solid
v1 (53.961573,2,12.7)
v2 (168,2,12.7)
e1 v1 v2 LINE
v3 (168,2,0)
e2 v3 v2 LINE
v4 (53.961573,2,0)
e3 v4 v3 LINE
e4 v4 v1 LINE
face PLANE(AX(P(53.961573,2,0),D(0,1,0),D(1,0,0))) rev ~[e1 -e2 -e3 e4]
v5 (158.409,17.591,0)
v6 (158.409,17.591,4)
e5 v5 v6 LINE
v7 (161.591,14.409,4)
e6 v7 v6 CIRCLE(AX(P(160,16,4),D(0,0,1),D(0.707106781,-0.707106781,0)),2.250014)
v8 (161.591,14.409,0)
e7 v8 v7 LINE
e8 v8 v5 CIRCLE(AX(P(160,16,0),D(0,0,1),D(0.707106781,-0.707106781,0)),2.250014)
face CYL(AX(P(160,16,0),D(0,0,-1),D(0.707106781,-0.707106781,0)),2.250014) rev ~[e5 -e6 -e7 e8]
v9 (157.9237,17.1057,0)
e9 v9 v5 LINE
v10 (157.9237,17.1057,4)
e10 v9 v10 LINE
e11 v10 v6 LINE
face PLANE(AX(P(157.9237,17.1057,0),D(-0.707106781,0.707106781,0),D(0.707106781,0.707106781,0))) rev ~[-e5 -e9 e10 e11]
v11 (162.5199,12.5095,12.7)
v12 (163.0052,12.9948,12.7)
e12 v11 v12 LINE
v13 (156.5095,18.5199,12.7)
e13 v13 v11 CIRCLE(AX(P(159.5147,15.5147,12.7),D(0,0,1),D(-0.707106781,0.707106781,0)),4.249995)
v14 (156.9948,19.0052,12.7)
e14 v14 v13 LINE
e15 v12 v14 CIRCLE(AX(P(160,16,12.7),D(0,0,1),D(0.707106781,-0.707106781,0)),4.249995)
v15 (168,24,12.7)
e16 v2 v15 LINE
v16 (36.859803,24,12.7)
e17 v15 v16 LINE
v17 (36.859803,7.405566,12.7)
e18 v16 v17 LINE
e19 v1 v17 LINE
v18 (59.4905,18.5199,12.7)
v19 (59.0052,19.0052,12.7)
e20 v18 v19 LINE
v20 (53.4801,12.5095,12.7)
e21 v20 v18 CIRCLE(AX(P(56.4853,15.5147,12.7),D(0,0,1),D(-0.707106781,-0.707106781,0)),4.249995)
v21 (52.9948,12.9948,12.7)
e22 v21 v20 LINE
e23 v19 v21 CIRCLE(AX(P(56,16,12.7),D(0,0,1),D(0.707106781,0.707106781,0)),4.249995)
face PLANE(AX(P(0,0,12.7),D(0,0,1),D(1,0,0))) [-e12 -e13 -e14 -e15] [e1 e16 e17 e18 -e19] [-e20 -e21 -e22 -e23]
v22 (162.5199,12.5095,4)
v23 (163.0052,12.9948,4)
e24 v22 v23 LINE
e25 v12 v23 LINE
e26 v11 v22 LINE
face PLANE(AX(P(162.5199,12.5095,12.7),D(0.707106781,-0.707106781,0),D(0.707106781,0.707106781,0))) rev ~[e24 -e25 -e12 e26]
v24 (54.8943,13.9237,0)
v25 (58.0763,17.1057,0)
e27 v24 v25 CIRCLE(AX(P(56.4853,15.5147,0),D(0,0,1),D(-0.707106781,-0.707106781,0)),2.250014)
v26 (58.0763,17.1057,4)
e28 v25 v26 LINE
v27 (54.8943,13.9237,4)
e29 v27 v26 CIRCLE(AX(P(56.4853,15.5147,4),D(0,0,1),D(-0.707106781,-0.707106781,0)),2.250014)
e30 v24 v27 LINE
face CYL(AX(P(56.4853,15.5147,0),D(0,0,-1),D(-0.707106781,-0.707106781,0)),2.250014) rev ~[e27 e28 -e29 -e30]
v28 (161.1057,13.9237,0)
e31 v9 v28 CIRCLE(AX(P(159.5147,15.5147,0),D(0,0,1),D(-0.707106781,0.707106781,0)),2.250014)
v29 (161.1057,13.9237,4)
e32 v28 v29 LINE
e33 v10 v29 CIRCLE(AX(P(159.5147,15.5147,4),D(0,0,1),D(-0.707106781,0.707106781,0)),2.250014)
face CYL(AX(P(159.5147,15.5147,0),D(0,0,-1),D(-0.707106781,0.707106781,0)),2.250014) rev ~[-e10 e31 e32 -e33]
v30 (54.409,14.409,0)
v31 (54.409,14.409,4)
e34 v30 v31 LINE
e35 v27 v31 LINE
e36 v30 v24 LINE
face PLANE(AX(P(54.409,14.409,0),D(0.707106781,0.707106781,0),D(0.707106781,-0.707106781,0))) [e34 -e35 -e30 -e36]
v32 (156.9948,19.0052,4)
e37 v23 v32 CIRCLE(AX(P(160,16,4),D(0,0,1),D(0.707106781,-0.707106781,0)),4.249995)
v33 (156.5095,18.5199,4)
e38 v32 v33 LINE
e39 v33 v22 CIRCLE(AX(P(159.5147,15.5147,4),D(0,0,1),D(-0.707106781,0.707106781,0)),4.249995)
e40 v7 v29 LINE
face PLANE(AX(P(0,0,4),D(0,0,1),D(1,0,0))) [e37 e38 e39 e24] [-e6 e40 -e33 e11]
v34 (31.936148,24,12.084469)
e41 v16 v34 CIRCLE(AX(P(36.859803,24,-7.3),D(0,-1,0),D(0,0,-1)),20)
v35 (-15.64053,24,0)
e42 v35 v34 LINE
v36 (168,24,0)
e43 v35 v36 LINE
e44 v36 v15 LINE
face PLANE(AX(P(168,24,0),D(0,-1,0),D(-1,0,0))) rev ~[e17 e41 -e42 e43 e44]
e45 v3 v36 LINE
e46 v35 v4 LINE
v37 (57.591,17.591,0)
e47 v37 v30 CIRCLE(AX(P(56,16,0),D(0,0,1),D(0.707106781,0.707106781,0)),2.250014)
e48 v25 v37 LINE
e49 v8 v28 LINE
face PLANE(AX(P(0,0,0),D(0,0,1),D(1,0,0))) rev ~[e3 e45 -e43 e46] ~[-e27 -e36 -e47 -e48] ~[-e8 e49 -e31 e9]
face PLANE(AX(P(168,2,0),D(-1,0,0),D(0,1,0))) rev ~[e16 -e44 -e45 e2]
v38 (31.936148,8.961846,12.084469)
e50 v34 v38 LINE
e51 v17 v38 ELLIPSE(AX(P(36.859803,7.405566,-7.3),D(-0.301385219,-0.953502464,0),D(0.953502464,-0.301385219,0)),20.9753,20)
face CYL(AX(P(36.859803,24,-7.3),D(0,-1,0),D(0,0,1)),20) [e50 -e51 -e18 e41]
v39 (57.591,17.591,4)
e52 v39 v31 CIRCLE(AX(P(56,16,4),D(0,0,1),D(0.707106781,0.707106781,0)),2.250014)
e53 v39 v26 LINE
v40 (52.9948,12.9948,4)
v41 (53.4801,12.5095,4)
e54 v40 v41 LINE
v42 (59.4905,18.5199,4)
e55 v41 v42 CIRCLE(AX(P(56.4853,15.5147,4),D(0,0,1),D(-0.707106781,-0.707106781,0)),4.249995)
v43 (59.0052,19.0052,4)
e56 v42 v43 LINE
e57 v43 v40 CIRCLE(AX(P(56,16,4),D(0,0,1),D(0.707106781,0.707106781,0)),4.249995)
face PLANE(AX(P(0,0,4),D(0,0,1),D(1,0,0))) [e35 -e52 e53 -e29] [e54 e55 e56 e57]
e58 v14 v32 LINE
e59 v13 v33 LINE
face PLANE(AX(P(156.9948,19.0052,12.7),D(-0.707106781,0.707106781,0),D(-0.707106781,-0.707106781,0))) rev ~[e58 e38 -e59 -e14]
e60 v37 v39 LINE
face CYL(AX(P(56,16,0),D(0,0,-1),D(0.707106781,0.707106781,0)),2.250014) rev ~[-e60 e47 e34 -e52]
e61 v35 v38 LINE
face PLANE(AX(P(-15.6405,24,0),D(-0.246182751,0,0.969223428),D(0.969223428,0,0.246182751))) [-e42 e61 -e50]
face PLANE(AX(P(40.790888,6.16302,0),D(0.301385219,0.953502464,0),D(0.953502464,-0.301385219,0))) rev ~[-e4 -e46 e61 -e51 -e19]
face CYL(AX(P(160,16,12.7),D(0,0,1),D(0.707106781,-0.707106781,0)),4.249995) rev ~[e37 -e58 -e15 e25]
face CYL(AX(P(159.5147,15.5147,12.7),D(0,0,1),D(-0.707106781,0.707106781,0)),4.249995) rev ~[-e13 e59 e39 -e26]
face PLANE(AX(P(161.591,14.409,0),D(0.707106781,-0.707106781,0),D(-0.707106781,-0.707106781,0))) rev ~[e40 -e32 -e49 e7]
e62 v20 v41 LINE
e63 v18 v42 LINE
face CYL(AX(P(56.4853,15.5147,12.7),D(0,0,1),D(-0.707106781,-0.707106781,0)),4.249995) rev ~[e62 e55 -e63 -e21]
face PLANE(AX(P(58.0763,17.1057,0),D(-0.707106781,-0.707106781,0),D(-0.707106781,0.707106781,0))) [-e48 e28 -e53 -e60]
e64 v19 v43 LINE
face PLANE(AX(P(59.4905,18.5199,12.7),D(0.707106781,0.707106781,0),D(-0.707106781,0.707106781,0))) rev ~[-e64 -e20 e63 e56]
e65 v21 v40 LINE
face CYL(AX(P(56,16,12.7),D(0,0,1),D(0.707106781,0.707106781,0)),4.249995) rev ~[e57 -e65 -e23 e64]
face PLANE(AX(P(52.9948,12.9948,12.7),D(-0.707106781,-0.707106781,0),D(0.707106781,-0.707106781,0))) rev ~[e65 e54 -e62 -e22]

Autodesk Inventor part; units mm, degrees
ref_plane "YZ Plane" through (0, 0, 0) normal (1, 0, 0) x (0, 1, 0)
ref_plane "XZ Plane" through (0, 0, 0) normal (0, 1, 0) x (-1, 0, 0)
ref_plane "XY Plane" through (0, 0, 0) normal (0, 0, 1) x (1, 0, 0)
ref_plane "Work Plane1" through (0, 0, 0) normal (0, 0, 1) x (1, 0, 0)
sketch "Sketch1" plane through (0, 0, 0) normal (0, 0, 1) x (1, 0, 0)
  line L0 (168, 0) -> (168, 48) projected
  line L1 (0, 48) -> (168, 48) projected
  line L2 (0, 0) -> (0, 48) projected
  line L3 (0, 0) -> (168, 0) projected
  circle A0 centre (144, 24) radius 7 projected
  circle A1 centre (120, 24) radius 7 projected
  arc A2 (136.9289, 33.8995) -> (134.1005, 31.0711) centre (135.5147, 32.4853) ccw projected
  line L4 (137.4142, 33.4142) -> (136.9289, 33.8995) projected
  arc A3 (134.5858, 30.5858) -> (137.4142, 33.4142) centre (136, 32) ccw projected
  line L5 (134.1005, 31.0711) -> (134.5858, 30.5858) projected
  line L6 (132.6863, 26) -> (131.3137, 26) projected
  arc A4 (132.6863, 22) -> (132.6863, 26) centre (132.6863, 24) ccw projected
  line L7 (131.3137, 22) -> (132.6863, 22) projected
  arc A5 (131.3137, 26) -> (131.3137, 22) centre (131.3137, 24) ccw projected
  arc A6 (134.1005, 16.9289) -> (136.9289, 14.1005) centre (135.5147, 15.5147) ccw projected
  line L8 (134.5858, 17.4142) -> (134.1005, 16.9289) projected
  arc A7 (137.4142, 14.5858) -> (134.5858, 17.4142) centre (136, 16) ccw projected
  line L9 (136.9289, 14.1005) -> (137.4142, 14.5858) projected
  arc A8 (153.8995, 31.0711) -> (151.0711, 33.8995) centre (152.4853, 32.4853) ccw projected
  line L10 (153.4142, 30.5858) -> (153.8995, 31.0711) projected
  arc A9 (150.5858, 33.4142) -> (153.4142, 30.5858) centre (152, 32) ccw projected
  line L11 (151.0711, 33.8995) -> (150.5858, 33.4142) projected
  arc A10 (156.6863, 22) -> (156.6863, 26) centre (156.6863, 24) ccw projected
  line L12 (155.3137, 22) -> (156.6863, 22) projected
  arc A11 (155.3137, 26) -> (155.3137, 22) centre (155.3137, 24) ccw projected
  line L13 (156.6863, 26) -> (155.3137, 26) projected
  line L14 (146, 35.3137) -> (146, 40) projected
  arc A12 (142, 35.3137) -> (146, 35.3137) centre (144, 35.3137) ccw projected
  line L15 (142, 40) -> (142, 35.3137) projected
  arc A13 (146, 40) -> (142, 40) centre (144, 40) ccw projected
  circle A14 centre (136, 40) radius 2 projected
  circle A15 centre (128, 40) radius 2 projected
  line L16 (122, 35.3137) -> (122, 40) projected
  arc A16 (118, 35.3137) -> (122, 35.3137) centre (120, 35.3137) ccw projected
  line L17 (118, 40) -> (118, 35.3137) projected
  arc A17 (122, 40) -> (118, 40) centre (120, 40) ccw projected
  circle A18 centre (112, 40) radius 2 projected
  circle A19 centre (104, 40) radius 2 projected
  line L18 (98, 35.3137) -> (98, 40) projected
  arc A20 (94, 35.3137) -> (98, 35.3137) centre (96, 35.3137) ccw projected
  line L19 (94, 40) -> (94, 35.3137) projected
  arc A21 (98, 40) -> (94, 40) centre (96, 40) ccw projected
  circle A22 centre (88, 40) radius 2 projected
  circle A23 centre (80, 40) radius 2 projected
  line L20 (74, 35.3137) -> (74, 40) projected
  arc A24 (70, 35.3137) -> (74, 35.3137) centre (72, 35.3137) ccw projected
  line L21 (70, 40) -> (70, 35.3137) projected
  arc A25 (74, 40) -> (70, 40) centre (72, 40) ccw projected
  circle A26 centre (64, 40) radius 2 projected
  circle A27 centre (56, 40) radius 2 projected
  line L22 (50, 35.3137) -> (50, 40) projected
  arc A28 (46, 35.3137) -> (50, 35.3137) centre (48, 35.3137) ccw projected
  line L23 (46, 40) -> (46, 35.3137) projected
  arc A29 (50, 40) -> (46, 40) centre (48, 40) ccw projected
  circle A30 centre (40, 40) radius 2 projected
  circle A31 centre (32, 40) radius 2 projected
  line L24 (26, 35.3137) -> (26, 40) projected
  arc A32 (22, 35.3137) -> (26, 35.3137) centre (24, 35.3137) ccw projected
  line L25 (22, 40) -> (22, 35.3137) projected
  arc A33 (26, 40) -> (22, 40) centre (24, 40) ccw projected
  circle A34 centre (16, 40) radius 2 projected
  circle A35 centre (8, 40) radius 2 projected
  line L26 (142, 12.6863) -> (142, 8) projected
  arc A36 (146, 12.6863) -> (142, 12.6863) centre (144, 12.6863) ccw projected
  line L27 (146, 8) -> (146, 12.6863) projected
  arc A37 (142, 8) -> (146, 8) centre (144, 8) ccw projected
  circle A38 centre (136, 8) radius 2 projected
  circle A39 centre (128, 8) radius 2 projected
  line L28 (118, 12.6863) -> (118, 8) projected
  arc A40 (122, 12.6863) -> (118, 12.6863) centre (120, 12.6863) ccw projected
  line L29 (122, 8) -> (122, 12.6863) projected
  arc A41 (118, 8) -> (122, 8) centre (120, 8) ccw projected
  circle A42 centre (112, 8) radius 2 projected
  circle A43 centre (104, 8) radius 2 projected
  line L30 (94, 12.6863) -> (94, 8) projected
  arc A44 (98, 12.6863) -> (94, 12.6863) centre (96, 12.6863) ccw projected
  line L31 (98, 8) -> (98, 12.6863) projected
  arc A45 (94, 8) -> (98, 8) centre (96, 8) ccw projected
  circle A46 centre (88, 8) radius 2 projected
  circle A47 centre (80, 8) radius 2 projected
  line L32 (70, 12.6863) -> (70, 8) projected
  arc A48 (74, 12.6863) -> (70, 12.6863) centre (72, 12.6863) ccw projected
  line L33 (74, 8) -> (74, 12.6863) projected
  arc A49 (70, 8) -> (74, 8) centre (72, 8) ccw projected
  circle A50 centre (64, 8) radius 2 projected
  circle A51 centre (56, 8) radius 2 projected
  line L34 (46, 12.6863) -> (46, 8) projected
  arc A52 (50, 12.6863) -> (46, 12.6863) centre (48, 12.6863) ccw projected
  line L35 (50, 8) -> (50, 12.6863) projected
  arc A53 (46, 8) -> (50, 8) centre (48, 8) ccw projected
  circle A54 centre (40, 8) radius 2 projected
  circle A55 centre (32, 8) radius 2 projected
  line L36 (22, 12.6863) -> (22, 8) projected
  arc A56 (26, 12.6863) -> (22, 12.6863) centre (24, 12.6863) ccw projected
  line L37 (26, 8) -> (26, 12.6863) projected
  arc A57 (22, 8) -> (26, 8) centre (24, 8) ccw projected
  circle A58 centre (16, 8) radius 2 projected
  circle A59 centre (8, 8) radius 2 projected
  arc A60 (9.8995, 31.0711) -> (7.0711, 33.8995) centre (8.4853, 32.4853) ccw projected
  line L38 (9.4142, 30.5858) -> (9.8995, 31.0711) projected
  arc A61 (6.5858, 33.4142) -> (9.4142, 30.5858) centre (8, 32) ccw projected
  line L39 (7.0711, 33.8995) -> (6.5858, 33.4142) projected
  arc A62 (7.0711, 14.1005) -> (9.8995, 16.9289) centre (8.4853, 15.5147) ccw projected
  line L40 (6.5858, 14.5858) -> (7.0711, 14.1005) projected
  arc A63 (9.4142, 17.4142) -> (6.5858, 14.5858) centre (8, 16) ccw projected
  line L41 (9.8995, 16.9289) -> (9.4142, 17.4142) projected
  arc A64 (160.9289, 33.8995) -> (158.1005, 31.0711) centre (159.5147, 32.4853) ccw projected
  line L42 (161.4142, 33.4142) -> (160.9289, 33.8995) projected
  arc A65 (158.5858, 30.5858) -> (161.4142, 33.4142) centre (160, 32) ccw projected
  line L43 (158.1005, 31.0711) -> (158.5858, 30.5858) projected
  arc A66 (158.1005, 16.9289) -> (160.9289, 14.1005) centre (159.5147, 15.5147) ccw projected
  line L44 (158.5858, 17.4142) -> (158.1005, 16.9289) projected
  arc A67 (161.4142, 14.5858) -> (158.5858, 17.4142) centre (160, 16) ccw projected
  line L45 (160.9289, 14.1005) -> (161.4142, 14.5858) projected
  circle A68 centre (152, 8) radius 2 projected
  circle A69 centre (152, 40) radius 2 projected
  circle A70 centre (160, 40) radius 2 projected
  circle A71 centre (160, 8) radius 2 projected
  arc A72 (33.8995, 31.0711) -> (31.0711, 33.8995) centre (32.4853, 32.4853) ccw projected
  line L46 (33.4142, 30.5858) -> (33.8995, 31.0711) projected
  arc A73 (30.5858, 33.4142) -> (33.4142, 30.5858) centre (32, 32) ccw projected
  line L47 (31.0711, 33.8995) -> (30.5858, 33.4142) projected
  arc A74 (57.8995, 31.0711) -> (55.0711, 33.8995) centre (56.4853, 32.4853) ccw projected
  line L48 (57.4142, 30.5858) -> (57.8995, 31.0711) projected
  arc A75 (54.5858, 33.4142) -> (57.4142, 30.5858) centre (56, 32) ccw projected
  line L49 (55.0711, 33.8995) -> (54.5858, 33.4142) projected
  arc A76 (81.8995, 31.0711) -> (79.0711, 33.8995) centre (80.4853, 32.4853) ccw projected
  line L50 (81.4142, 30.5858) -> (81.8995, 31.0711) projected
  arc A77 (78.5858, 33.4142) -> (81.4142, 30.5858) centre (80, 32) ccw projected
  line L51 (79.0711, 33.8995) -> (78.5858, 33.4142) projected
  arc A78 (105.8995, 31.0711) -> (103.0711, 33.8995) centre (104.4853, 32.4853) ccw projected
  line L52 (105.4142, 30.5858) -> (105.8995, 31.0711) projected
  arc A79 (102.5858, 33.4142) -> (105.4142, 30.5858) centre (104, 32) ccw projected
  line L53 (103.0711, 33.8995) -> (102.5858, 33.4142) projected
  arc A80 (129.8995, 31.0711) -> (127.0711, 33.8995) centre (128.4853, 32.4853) ccw projected
  line L54 (129.4142, 30.5858) -> (129.8995, 31.0711) projected
  arc A81 (126.5858, 33.4142) -> (129.4142, 30.5858) centre (128, 32) ccw projected
  line L55 (127.0711, 33.8995) -> (126.5858, 33.4142) projected
  arc A82 (14.1005, 16.9289) -> (16.9289, 14.1005) centre (15.5147, 15.5147) ccw projected
  line L56 (14.5858, 17.4142) -> (14.1005, 16.9289) projected
  arc A83 (17.4142, 14.5858) -> (14.5858, 17.4142) centre (16, 16) ccw projected
  line L57 (16.9289, 14.1005) -> (17.4142, 14.5858) projected
  arc A84 (38.1005, 16.9289) -> (40.9289, 14.1005) centre (39.5147, 15.5147) ccw projected
  line L58 (38.5858, 17.4142) -> (38.1005, 16.9289) projected
  arc A85 (41.4142, 14.5858) -> (38.5858, 17.4142) centre (40, 16) ccw projected
  line L59 (40.9289, 14.1005) -> (41.4142, 14.5858) projected
  arc A86 (62.1005, 16.9289) -> (64.9289, 14.1005) centre (63.5147, 15.5147) ccw projected
  line L60 (62.5858, 17.4142) -> (62.1005, 16.9289) projected
  arc A87 (65.4142, 14.5858) -> (62.5858, 17.4142) centre (64, 16) ccw projected
  line L61 (64.9289, 14.1005) -> (65.4142, 14.5858) projected
  arc A88 (86.1005, 16.9289) -> (88.9289, 14.1005) centre (87.5147, 15.5147) ccw projected
  line L62 (86.5858, 17.4142) -> (86.1005, 16.9289) projected
  arc A89 (89.4142, 14.5858) -> (86.5858, 17.4142) centre (88, 16) ccw projected
  line L63 (88.9289, 14.1005) -> (89.4142, 14.5858) projected
  arc A90 (110.1005, 16.9289) -> (112.9289, 14.1005) centre (111.5147, 15.5147) ccw projected
  line L64 (110.5858, 17.4142) -> (110.1005, 16.9289) projected
  arc A91 (113.4142, 14.5858) -> (110.5858, 17.4142) centre (112, 16) ccw projected
  line L65 (112.9289, 14.1005) -> (113.4142, 14.5858) projected
  line L66 (11.3137, 22) -> (12.6863, 22) projected
  arc A92 (11.3137, 26) -> (11.3137, 22) centre (11.3137, 24) ccw projected
  line L67 (12.6863, 26) -> (11.3137, 26) projected
  arc A93 (12.6863, 22) -> (12.6863, 26) centre (12.6863, 24) ccw projected
  line L68 (36.6863, 26) -> (35.3137, 26) projected
  arc A94 (36.6863, 22) -> (36.6863, 26) centre (36.6863, 24) ccw projected
  line L69 (35.3137, 22) -> (36.6863, 22) projected
  arc A95 (35.3137, 26) -> (35.3137, 22) centre (35.3137, 24) ccw projected
  line L70 (60.6863, 26) -> (59.3137, 26) projected
  arc A96 (60.6863, 22) -> (60.6863, 26) centre (60.6863, 24) ccw projected
  line L71 (59.3137, 22) -> (60.6863, 22) projected
  arc A97 (59.3137, 26) -> (59.3137, 22) centre (59.3137, 24) ccw projected
  line L72 (84.6863, 26) -> (83.3137, 26) projected
  arc A98 (84.6863, 22) -> (84.6863, 26) centre (84.6863, 24) ccw projected
  line L73 (83.3137, 22) -> (84.6863, 22) projected
  arc A99 (83.3137, 26) -> (83.3137, 22) centre (83.3137, 24) ccw projected
  line L74 (108.6863, 26) -> (107.3137, 26) projected
  arc A100 (108.6863, 22) -> (108.6863, 26) centre (108.6863, 24) ccw projected
  line L75 (107.3137, 22) -> (108.6863, 22) projected
  arc A101 (107.3137, 26) -> (107.3137, 22) centre (107.3137, 24) ccw projected
  arc A102 (16.9289, 33.8995) -> (14.1005, 31.0711) centre (15.5147, 32.4853) ccw projected
  line L76 (17.4142, 33.4142) -> (16.9289, 33.8995) projected
  arc A103 (14.5858, 30.5858) -> (17.4142, 33.4142) centre (16, 32) ccw projected
  line L77 (14.1005, 31.0711) -> (14.5858, 30.5858) projected
  arc A104 (40.9289, 33.8995) -> (38.1005, 31.0711) centre (39.5147, 32.4853) ccw projected
  line L78 (41.4142, 33.4142) -> (40.9289, 33.8995) projected
  arc A105 (38.5858, 30.5858) -> (41.4142, 33.4142) centre (40, 32) ccw projected
  line L79 (38.1005, 31.0711) -> (38.5858, 30.5858) projected
  arc A106 (64.9289, 33.8995) -> (62.1005, 31.0711) centre (63.5147, 32.4853) ccw projected
  line L80 (65.4142, 33.4142) -> (64.9289, 33.8995) projected
  arc A107 (62.5858, 30.5858) -> (65.4142, 33.4142) centre (64, 32) ccw projected
  line L81 (62.1005, 31.0711) -> (62.5858, 30.5858) projected
  arc A108 (88.9289, 33.8995) -> (86.1005, 31.0711) centre (87.5147, 32.4853) ccw projected
  line L82 (89.4142, 33.4142) -> (88.9289, 33.8995) projected
  arc A109 (86.5858, 30.5858) -> (89.4142, 33.4142) centre (88, 32) ccw projected
  line L83 (86.1005, 31.0711) -> (86.5858, 30.5858) projected
  arc A110 (112.9289, 33.8995) -> (110.1005, 31.0711) centre (111.5147, 32.4853) ccw projected
  line L84 (113.4142, 33.4142) -> (112.9289, 33.8995) projected
  arc A111 (110.5858, 30.5858) -> (113.4142, 33.4142) centre (112, 32) ccw projected
  line L85 (110.1005, 31.0711) -> (110.5858, 30.5858) projected
  arc A112 (31.0711, 14.1005) -> (33.8995, 16.9289) centre (32.4853, 15.5147) ccw projected
  line L86 (30.5858, 14.5858) -> (31.0711, 14.1005) projected
  arc A113 (33.4142, 17.4142) -> (30.5858, 14.5858) centre (32, 16) ccw projected
  line L87 (33.8995, 16.9289) -> (33.4142, 17.4142) projected
  arc A114 (55.0711, 14.1005) -> (57.8995, 16.9289) centre (56.4853, 15.5147) ccw projected
  line L88 (54.5858, 14.5858) -> (55.0711, 14.1005) projected
  arc A115 (57.4142, 17.4142) -> (54.5858, 14.5858) centre (56, 16) ccw projected
  line L89 (57.8995, 16.9289) -> (57.4142, 17.4142) projected
  arc A116 (79.0711, 14.1005) -> (81.8995, 16.9289) centre (80.4853, 15.5147) ccw projected
  line L90 (78.5858, 14.5858) -> (79.0711, 14.1005) projected
  arc A117 (81.4142, 17.4142) -> (78.5858, 14.5858) centre (80, 16) ccw projected
  line L91 (81.8995, 16.9289) -> (81.4142, 17.4142) projected
  arc A118 (103.0711, 14.1005) -> (105.8995, 16.9289) centre (104.4853, 15.5147) ccw projected
  line L92 (102.5858, 14.5858) -> (103.0711, 14.1005) projected
  arc A119 (105.4142, 17.4142) -> (102.5858, 14.5858) centre (104, 16) ccw projected
  line L93 (105.8995, 16.9289) -> (105.4142, 17.4142) projected
  arc A120 (127.0711, 14.1005) -> (129.8995, 16.9289) centre (128.4853, 15.5147) ccw projected
  line L94 (126.5858, 14.5858) -> (127.0711, 14.1005) projected
  arc A121 (129.4142, 17.4142) -> (126.5858, 14.5858) centre (128, 16) ccw projected
  line L95 (129.8995, 16.9289) -> (129.4142, 17.4142) projected
  arc A122 (151.0711, 14.1005) -> (153.8995, 16.9289) centre (152.4853, 15.5147) ccw projected
  line L96 (150.5858, 14.5858) -> (151.0711, 14.1005) projected
  arc A123 (153.4142, 17.4142) -> (150.5858, 14.5858) centre (152, 16) ccw projected
  line L97 (153.8995, 16.9289) -> (153.4142, 17.4142) projected
  circle A124 centre (24, 24) radius 7 projected
  circle A125 centre (48, 24) radius 7 projected
  circle A126 centre (72, 24) radius 7 projected
  circle A127 centre (96, 24) radius 7 projected
  line L98 (168, 24) -> (-50.2098, 24)
  line L99 (-21.6738, 25.907) -> (54.2558, 1.907)
  line L100 (166, 46) -> (2, 46)
  line L101 (2, 46) -> (2, 2)
  line L102 (2, 2) -> (168, 2)
  line L103 (54.409, 14.409) -> (54.8943, 13.9237)
  arc A128 (54.8943, 13.9237) -> (58.0763, 17.1057) centre (56.4853, 15.5147) ccw
  line L104 (58.0763, 17.1057) -> (57.591, 17.591)
  arc A129 (57.591, 17.591) -> (54.409, 14.409) centre (56, 16) ccw
  arc A130 (157.9237, 17.1057) -> (161.1057, 13.9237) centre (159.5147, 15.5147) ccw
  line L105 (157.9237, 17.1057) -> (158.409, 17.591)
  arc A131 (161.591, 14.409) -> (158.409, 17.591) centre (160, 16) ccw
  line L106 (161.591, 14.409) -> (161.1057, 13.9237)
  point P0 (-15.6405, 24)
  point P1 (53.9616, 2)
  dimension "d1" = 2
  dimension "d2" = 0.25
  dimension "d3" = 0.25
extrude "Extrusion1" add sketch "Sketch1" along normal blind 12.7 contours L102 L99 A54 A55 L37 A56 L36 A82 L57 A83 L56 A62 L41 A63 L101 L98 A92 L66 A93 A124 A95 L69 A94 A125 A97 L71 A96 A126 A99 L73 A98 A127 A101 L75 A100 A1 A5 L7 A4 A0 A11 L12 A10 L0 | L99 L98 L2 | L2 L98 L101 L99 | A10 L12 A11 L98 | L99 A54 | A63 L41 A62 L99 | A0 L98 | L99 A55 | L98 A93 L66 A92 | A82 L56 A83 L57 L99 | A4 L7 A5 L98 | L99 L36 A56 L37 | L98 A124 | A1 L98 | L98 A94 L69 A95 | A100 L75 A101 L98 | L98 A125 | A127 L98 | L98 A96 L71 A97 | A98 L73 A99 L98 | L98 A126 | L8 A7 L9 A6 | A36 L27 A37 L26 | A38 | A39 | A40 L29 A41 L28 | A42 | A43 | A44 L31 A45 L30 | A46 | A47 | A48 L33 A49 L32 | A50 | A51 | A52 L35 A53 L34 | A68 | A71 | L58 A85 L59 A84 | L60 A87 L61 A86 | L62 A89 L63 A88 | L64 A91 L65 A90 | L86 A113 L87 A112 | L90 A117 L91 A116 | L92 A119 L93 A118 | L94 A121 L95 A120 | L96 A123 L97 A122 picked at (40.4231, 8.1099) picked at (145.645, 19.4481) picked at (32.4577, 9.177) picked at (22.475, 20.4369) picked at (119.7187, 21.6837) picked at (47.7187, 21.6837) picked at (95.7187, 21.6837) picked at (71.7187, 21.6837)
sketch "Sketch2" plane through (-15.6405, 24, 0) normal (0, 1, 0) x (1, 0, 0)
  line L0 (183.6405, 0) -> (0, 0) projected
  line L1 (0, 0) -> (50, -12.7)
  line L2 (183.6405, 0) -> (0, 0) projected
  line L3 (0, 0) -> (0, -12.7) projected
  line L4 (183.6405, -12.7) -> (0, -12.7) projected
  line L5 (183.6405, 0) -> (183.6405, -12.7) projected
  line L6 (183.6405, -12.7) -> (0, -12.7) projected
  point P0 (15.6405, 0)
  point P1 (0, 0)
  dimension "d6" = 50
extrude "Extrusion2" cut sketch "Sketch2" against normal blind 25 contours L1 L4 L3
fillet "Fillet1" radius 20 1 edges at (34.3595, 16.0979, 12.7)
sketch "Sketch4" plane through (0, 0, 12.7) normal (0, 0, 1) x (1, 0, 0)
  line L0 (36.8598, 7.4056) -> (36.8598, 24) projected
  line L1 (36.8598, 7.4056) -> (53.9616, 2) projected
  line L2 (53.9616, 2) -> (168, 2) projected
  line L3 (168, 2) -> (168, 24) projected
  line L4 (168, 24) -> (36.8598, 24) projected
  line L5 (161.591, 14.409) -> (161.1057, 13.9237) projected
  arc A0 (157.9237, 17.1057) -> (161.1057, 13.9237) centre (159.5147, 15.5147) ccw projected
  line L6 (157.9237, 17.1057) -> (158.409, 17.591) projected
  arc A1 (161.591, 14.409) -> (158.409, 17.591) centre (160, 16) ccw projected
  arc A2 (57.591, 17.591) -> (54.409, 14.409) centre (56, 16) ccw projected
  line L7 (57.591, 17.591) -> (58.0763, 17.1057) projected
  arc A3 (54.8943, 13.9237) -> (58.0763, 17.1057) centre (56.4853, 15.5147) ccw projected
  line L8 (54.8943, 13.9237) -> (54.409, 14.409) projected
  line L9 (59.4905, 18.5199) -> (59.0052, 19.0052)
  arc A4 (59.0052, 19.0052) -> (52.9948, 12.9948) centre (56, 16) ccw
  line L10 (52.9948, 12.9948) -> (53.4801, 12.5095)
  arc A5 (53.4801, 12.5095) -> (59.4905, 18.5199) centre (56.4853, 15.5147) ccw
  line L11 (156.9948, 19.0052) -> (156.5095, 18.5199)
  arc A6 (156.5095, 18.5199) -> (162.5199, 12.5095) centre (159.5147, 15.5147) ccw
  line L12 (162.5199, 12.5095) -> (163.0052, 12.9948)
  arc A7 (163.0052, 12.9948) -> (156.9948, 19.0052) centre (160, 16) ccw
  point P0 (0, 0)
  dimension "d10" = 2
  dimension "d11" = 2
extrude "Extrusion3" cut sketch "Sketch4" against normal blind 8.7 contours A5 L10 A4 L9 | A7 L12 A6 L11
properties part number "shooter side"
